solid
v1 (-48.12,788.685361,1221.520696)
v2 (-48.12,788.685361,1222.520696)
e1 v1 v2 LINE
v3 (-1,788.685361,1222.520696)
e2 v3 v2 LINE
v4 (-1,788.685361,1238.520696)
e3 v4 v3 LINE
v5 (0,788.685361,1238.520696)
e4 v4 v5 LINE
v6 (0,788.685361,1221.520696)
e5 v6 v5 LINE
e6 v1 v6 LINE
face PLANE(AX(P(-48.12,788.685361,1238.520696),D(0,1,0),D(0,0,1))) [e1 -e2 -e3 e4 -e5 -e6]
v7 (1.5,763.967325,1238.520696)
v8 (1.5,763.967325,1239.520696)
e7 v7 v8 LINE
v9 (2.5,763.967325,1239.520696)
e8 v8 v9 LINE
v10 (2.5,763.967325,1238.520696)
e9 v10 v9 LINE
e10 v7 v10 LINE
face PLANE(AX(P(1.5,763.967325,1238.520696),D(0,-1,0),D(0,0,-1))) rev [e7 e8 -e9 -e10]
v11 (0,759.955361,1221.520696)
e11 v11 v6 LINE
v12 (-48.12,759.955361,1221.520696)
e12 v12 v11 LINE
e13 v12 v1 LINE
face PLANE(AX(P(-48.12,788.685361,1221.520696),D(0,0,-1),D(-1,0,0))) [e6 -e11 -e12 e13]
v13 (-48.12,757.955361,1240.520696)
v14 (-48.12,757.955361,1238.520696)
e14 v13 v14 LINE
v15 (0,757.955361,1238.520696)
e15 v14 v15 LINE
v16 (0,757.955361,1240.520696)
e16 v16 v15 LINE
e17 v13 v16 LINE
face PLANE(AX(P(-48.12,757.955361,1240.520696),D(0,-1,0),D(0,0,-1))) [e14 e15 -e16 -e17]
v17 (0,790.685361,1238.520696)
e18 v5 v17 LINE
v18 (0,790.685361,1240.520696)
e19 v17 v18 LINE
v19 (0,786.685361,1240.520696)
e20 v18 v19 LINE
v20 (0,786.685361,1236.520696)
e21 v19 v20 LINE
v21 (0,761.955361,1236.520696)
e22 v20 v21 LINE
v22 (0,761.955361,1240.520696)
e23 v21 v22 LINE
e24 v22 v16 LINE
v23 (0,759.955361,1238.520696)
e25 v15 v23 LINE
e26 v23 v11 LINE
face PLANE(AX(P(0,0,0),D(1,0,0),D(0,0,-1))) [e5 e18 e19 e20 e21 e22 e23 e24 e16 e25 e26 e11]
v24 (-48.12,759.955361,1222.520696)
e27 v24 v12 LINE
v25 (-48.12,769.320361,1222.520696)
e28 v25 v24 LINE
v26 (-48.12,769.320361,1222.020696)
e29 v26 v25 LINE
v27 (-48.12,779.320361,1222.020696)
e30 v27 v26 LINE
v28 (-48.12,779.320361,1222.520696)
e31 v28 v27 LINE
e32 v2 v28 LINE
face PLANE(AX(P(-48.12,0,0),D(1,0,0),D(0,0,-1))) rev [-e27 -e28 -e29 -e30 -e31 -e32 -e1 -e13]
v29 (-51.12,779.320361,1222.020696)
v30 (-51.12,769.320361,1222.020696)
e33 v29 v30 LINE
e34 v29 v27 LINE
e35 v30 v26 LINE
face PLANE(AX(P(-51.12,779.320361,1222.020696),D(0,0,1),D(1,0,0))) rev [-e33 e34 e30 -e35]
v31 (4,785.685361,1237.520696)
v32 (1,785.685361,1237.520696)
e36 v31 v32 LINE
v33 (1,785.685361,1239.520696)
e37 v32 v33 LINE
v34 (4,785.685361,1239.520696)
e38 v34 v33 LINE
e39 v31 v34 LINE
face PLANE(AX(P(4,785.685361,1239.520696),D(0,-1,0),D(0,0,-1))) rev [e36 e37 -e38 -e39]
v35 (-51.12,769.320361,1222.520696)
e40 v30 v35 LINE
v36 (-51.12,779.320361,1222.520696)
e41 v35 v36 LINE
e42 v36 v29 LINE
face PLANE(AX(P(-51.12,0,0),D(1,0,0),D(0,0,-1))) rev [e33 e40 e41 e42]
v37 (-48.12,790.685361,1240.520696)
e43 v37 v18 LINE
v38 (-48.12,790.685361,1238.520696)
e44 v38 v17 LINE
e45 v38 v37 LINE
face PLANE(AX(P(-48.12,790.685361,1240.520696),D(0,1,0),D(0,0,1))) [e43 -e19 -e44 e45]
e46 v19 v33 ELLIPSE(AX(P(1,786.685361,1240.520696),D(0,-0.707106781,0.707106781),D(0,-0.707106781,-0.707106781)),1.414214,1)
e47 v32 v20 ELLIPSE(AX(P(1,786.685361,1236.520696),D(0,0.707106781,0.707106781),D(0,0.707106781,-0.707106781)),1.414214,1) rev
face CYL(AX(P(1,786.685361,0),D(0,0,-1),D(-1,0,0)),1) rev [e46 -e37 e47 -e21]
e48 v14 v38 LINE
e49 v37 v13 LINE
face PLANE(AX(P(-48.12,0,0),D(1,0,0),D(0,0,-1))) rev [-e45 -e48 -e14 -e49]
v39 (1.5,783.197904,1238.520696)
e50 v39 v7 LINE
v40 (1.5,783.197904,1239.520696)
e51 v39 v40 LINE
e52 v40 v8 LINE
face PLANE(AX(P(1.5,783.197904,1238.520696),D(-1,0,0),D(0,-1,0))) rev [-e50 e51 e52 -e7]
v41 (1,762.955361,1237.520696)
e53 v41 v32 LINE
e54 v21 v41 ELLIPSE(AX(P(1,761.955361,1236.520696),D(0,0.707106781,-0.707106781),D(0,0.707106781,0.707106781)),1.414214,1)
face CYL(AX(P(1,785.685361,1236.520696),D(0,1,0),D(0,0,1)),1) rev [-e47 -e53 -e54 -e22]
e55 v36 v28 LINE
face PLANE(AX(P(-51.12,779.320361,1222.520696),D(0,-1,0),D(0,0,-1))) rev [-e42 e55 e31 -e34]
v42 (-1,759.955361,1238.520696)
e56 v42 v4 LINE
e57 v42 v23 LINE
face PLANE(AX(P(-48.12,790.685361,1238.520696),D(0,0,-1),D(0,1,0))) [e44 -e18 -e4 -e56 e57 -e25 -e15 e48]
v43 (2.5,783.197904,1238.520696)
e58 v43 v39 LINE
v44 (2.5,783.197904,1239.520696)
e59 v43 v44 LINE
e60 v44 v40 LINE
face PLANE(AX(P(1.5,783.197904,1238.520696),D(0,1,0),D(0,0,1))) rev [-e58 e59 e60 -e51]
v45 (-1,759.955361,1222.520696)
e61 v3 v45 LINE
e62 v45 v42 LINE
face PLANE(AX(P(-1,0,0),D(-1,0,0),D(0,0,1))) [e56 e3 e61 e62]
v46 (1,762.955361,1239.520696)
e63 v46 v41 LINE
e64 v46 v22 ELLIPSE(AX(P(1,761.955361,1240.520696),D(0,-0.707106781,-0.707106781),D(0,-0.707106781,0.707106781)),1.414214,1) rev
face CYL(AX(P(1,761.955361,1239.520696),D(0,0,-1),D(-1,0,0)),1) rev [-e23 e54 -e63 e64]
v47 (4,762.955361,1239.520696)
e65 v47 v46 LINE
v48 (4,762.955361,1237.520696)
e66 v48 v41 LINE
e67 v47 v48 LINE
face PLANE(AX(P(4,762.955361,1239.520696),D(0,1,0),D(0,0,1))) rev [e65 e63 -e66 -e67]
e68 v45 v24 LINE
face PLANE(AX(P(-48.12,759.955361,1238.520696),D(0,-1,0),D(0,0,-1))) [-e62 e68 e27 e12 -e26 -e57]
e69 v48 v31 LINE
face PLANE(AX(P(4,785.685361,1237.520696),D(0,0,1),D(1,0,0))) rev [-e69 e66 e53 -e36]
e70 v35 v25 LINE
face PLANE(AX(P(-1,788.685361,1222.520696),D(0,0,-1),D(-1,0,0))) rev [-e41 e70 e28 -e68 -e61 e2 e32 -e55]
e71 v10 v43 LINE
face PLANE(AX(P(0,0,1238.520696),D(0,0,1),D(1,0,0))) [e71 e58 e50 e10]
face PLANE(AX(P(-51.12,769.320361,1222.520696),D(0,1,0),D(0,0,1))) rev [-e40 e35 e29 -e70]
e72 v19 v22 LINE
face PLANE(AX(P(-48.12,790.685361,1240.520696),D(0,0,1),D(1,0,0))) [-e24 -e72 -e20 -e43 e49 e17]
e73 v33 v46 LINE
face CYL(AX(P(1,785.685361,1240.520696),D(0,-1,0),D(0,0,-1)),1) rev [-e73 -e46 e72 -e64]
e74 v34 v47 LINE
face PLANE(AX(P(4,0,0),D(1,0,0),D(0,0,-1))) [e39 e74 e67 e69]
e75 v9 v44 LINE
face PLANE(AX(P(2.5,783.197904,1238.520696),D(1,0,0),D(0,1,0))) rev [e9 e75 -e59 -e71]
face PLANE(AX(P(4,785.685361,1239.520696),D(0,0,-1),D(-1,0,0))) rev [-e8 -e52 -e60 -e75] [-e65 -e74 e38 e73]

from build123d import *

# Parameters (mm, degrees)
BOSS_EXTRUDE1_DEPTH = 48.12
SKETCH3_W           = 16
SKETCH3_H           = 28.73
CUT_EXTRUDE1_DEPTH  = 47.12
SKETCH4_W           = 0.5
SKETCH4_H           = 10
BOSS_EXTRUDE2_DEPTH = 3
SKETCH5_W           = 2
SKETCH5_H           = 22.73
BOSS_EXTRUDE3_DEPTH = 4
SKETCH6_W           = 1
SKETCH6_H           = 19.230578804
CUT_EXTRUDE2_DEPTH  = 1
FILLET1_R           = 1
FILLET2_R           = 1
FILLET3_R           = 1
FILLET4_R           = 1


with BuildPart() as part:
    # Sketch2 → Boss-Extrude1 (new body)
    with BuildSketch(Plane(origin=(0, 0, 0), x_dir=(0, 0, -1), z_dir=(1, 0, 0))):
        Polygon((-1238.520696333, 790.685360665), (-1238.520696333, 788.685360665), (-1221.520696333, 788.685360665), (-1221.520696333, 759.955360665), (-1238.520696333, 759.955360665), (-1238.520696333, 757.955360665), (-1240.520696333, 757.955360665), (-1240.520696333, 790.685360665), align=None)
    extrude(amount=-BOSS_EXTRUDE1_DEPTH)

    # Sketch3 → Cut-Extrude1 (cut)
    with BuildSketch(Plane.ZY.offset(48.12)):
        with Locations((1230.520696333, 774.320360665)):
            Rectangle(SKETCH3_W, SKETCH3_H)
    extrude(amount=-CUT_EXTRUDE1_DEPTH, mode=Mode.SUBTRACT)

    # Sketch4 → Boss-Extrude2 (add)
    with BuildSketch(Plane.ZY.offset(48.12)):
        with Locations((1222.270696333, 774.320360665)):
            Rectangle(SKETCH4_W, SKETCH4_H)
    extrude(amount=BOSS_EXTRUDE2_DEPTH)

    # Sketch5 → Boss-Extrude3 (add)
    with BuildSketch(Plane(origin=(0, 0, 0), x_dir=(0, 0, -1), z_dir=(1, 0, 0))):
        with Locations((-1238.520696333, 774.320360665)):
            Rectangle(SKETCH5_W, SKETCH5_H)
    extrude(amount=BOSS_EXTRUDE3_DEPTH)

    # Sketch6 → Cut-Extrude2 (cut)
    with BuildSketch(Plane.XY.offset(1239.520696333)):
        with Locations((2, 773.582614675)):
            Rectangle(SKETCH6_W, SKETCH6_H)
    extrude(amount=-CUT_EXTRUDE2_DEPTH, mode=Mode.SUBTRACT)

    # Fillet1
    fillet1_edges = [part.edges().sort_by_distance(p)[0] for p in [
        (0, 774.320360665, 1239.520696333),
    ]]
    fillet(fillet1_edges, radius=FILLET1_R - 0.0001)  # a hair under: the kernel refuses the full size

    # Fillet2
    fillet2_edges = [part.edges().sort_by_distance(p)[0] for p in [
        (0, 774.320360665, 1237.520696333),
    ]]
    fillet(fillet2_edges, radius=FILLET2_R)

    # Fillet3
    fillet3_edges = [part.edges().sort_by_distance(p)[0] for p in [
        (0, 785.685360665, 1238.520646333),
    ]]
    fillet(fillet3_edges, radius=FILLET3_R)

    # Fillet4
    fillet4_edges = [part.edges().sort_by_distance(p)[0] for p in [
        (0, 762.955360665, 1238.520646333),
    ]]
    fillet(fillet4_edges, radius=FILLET4_R)


solid = part.part
